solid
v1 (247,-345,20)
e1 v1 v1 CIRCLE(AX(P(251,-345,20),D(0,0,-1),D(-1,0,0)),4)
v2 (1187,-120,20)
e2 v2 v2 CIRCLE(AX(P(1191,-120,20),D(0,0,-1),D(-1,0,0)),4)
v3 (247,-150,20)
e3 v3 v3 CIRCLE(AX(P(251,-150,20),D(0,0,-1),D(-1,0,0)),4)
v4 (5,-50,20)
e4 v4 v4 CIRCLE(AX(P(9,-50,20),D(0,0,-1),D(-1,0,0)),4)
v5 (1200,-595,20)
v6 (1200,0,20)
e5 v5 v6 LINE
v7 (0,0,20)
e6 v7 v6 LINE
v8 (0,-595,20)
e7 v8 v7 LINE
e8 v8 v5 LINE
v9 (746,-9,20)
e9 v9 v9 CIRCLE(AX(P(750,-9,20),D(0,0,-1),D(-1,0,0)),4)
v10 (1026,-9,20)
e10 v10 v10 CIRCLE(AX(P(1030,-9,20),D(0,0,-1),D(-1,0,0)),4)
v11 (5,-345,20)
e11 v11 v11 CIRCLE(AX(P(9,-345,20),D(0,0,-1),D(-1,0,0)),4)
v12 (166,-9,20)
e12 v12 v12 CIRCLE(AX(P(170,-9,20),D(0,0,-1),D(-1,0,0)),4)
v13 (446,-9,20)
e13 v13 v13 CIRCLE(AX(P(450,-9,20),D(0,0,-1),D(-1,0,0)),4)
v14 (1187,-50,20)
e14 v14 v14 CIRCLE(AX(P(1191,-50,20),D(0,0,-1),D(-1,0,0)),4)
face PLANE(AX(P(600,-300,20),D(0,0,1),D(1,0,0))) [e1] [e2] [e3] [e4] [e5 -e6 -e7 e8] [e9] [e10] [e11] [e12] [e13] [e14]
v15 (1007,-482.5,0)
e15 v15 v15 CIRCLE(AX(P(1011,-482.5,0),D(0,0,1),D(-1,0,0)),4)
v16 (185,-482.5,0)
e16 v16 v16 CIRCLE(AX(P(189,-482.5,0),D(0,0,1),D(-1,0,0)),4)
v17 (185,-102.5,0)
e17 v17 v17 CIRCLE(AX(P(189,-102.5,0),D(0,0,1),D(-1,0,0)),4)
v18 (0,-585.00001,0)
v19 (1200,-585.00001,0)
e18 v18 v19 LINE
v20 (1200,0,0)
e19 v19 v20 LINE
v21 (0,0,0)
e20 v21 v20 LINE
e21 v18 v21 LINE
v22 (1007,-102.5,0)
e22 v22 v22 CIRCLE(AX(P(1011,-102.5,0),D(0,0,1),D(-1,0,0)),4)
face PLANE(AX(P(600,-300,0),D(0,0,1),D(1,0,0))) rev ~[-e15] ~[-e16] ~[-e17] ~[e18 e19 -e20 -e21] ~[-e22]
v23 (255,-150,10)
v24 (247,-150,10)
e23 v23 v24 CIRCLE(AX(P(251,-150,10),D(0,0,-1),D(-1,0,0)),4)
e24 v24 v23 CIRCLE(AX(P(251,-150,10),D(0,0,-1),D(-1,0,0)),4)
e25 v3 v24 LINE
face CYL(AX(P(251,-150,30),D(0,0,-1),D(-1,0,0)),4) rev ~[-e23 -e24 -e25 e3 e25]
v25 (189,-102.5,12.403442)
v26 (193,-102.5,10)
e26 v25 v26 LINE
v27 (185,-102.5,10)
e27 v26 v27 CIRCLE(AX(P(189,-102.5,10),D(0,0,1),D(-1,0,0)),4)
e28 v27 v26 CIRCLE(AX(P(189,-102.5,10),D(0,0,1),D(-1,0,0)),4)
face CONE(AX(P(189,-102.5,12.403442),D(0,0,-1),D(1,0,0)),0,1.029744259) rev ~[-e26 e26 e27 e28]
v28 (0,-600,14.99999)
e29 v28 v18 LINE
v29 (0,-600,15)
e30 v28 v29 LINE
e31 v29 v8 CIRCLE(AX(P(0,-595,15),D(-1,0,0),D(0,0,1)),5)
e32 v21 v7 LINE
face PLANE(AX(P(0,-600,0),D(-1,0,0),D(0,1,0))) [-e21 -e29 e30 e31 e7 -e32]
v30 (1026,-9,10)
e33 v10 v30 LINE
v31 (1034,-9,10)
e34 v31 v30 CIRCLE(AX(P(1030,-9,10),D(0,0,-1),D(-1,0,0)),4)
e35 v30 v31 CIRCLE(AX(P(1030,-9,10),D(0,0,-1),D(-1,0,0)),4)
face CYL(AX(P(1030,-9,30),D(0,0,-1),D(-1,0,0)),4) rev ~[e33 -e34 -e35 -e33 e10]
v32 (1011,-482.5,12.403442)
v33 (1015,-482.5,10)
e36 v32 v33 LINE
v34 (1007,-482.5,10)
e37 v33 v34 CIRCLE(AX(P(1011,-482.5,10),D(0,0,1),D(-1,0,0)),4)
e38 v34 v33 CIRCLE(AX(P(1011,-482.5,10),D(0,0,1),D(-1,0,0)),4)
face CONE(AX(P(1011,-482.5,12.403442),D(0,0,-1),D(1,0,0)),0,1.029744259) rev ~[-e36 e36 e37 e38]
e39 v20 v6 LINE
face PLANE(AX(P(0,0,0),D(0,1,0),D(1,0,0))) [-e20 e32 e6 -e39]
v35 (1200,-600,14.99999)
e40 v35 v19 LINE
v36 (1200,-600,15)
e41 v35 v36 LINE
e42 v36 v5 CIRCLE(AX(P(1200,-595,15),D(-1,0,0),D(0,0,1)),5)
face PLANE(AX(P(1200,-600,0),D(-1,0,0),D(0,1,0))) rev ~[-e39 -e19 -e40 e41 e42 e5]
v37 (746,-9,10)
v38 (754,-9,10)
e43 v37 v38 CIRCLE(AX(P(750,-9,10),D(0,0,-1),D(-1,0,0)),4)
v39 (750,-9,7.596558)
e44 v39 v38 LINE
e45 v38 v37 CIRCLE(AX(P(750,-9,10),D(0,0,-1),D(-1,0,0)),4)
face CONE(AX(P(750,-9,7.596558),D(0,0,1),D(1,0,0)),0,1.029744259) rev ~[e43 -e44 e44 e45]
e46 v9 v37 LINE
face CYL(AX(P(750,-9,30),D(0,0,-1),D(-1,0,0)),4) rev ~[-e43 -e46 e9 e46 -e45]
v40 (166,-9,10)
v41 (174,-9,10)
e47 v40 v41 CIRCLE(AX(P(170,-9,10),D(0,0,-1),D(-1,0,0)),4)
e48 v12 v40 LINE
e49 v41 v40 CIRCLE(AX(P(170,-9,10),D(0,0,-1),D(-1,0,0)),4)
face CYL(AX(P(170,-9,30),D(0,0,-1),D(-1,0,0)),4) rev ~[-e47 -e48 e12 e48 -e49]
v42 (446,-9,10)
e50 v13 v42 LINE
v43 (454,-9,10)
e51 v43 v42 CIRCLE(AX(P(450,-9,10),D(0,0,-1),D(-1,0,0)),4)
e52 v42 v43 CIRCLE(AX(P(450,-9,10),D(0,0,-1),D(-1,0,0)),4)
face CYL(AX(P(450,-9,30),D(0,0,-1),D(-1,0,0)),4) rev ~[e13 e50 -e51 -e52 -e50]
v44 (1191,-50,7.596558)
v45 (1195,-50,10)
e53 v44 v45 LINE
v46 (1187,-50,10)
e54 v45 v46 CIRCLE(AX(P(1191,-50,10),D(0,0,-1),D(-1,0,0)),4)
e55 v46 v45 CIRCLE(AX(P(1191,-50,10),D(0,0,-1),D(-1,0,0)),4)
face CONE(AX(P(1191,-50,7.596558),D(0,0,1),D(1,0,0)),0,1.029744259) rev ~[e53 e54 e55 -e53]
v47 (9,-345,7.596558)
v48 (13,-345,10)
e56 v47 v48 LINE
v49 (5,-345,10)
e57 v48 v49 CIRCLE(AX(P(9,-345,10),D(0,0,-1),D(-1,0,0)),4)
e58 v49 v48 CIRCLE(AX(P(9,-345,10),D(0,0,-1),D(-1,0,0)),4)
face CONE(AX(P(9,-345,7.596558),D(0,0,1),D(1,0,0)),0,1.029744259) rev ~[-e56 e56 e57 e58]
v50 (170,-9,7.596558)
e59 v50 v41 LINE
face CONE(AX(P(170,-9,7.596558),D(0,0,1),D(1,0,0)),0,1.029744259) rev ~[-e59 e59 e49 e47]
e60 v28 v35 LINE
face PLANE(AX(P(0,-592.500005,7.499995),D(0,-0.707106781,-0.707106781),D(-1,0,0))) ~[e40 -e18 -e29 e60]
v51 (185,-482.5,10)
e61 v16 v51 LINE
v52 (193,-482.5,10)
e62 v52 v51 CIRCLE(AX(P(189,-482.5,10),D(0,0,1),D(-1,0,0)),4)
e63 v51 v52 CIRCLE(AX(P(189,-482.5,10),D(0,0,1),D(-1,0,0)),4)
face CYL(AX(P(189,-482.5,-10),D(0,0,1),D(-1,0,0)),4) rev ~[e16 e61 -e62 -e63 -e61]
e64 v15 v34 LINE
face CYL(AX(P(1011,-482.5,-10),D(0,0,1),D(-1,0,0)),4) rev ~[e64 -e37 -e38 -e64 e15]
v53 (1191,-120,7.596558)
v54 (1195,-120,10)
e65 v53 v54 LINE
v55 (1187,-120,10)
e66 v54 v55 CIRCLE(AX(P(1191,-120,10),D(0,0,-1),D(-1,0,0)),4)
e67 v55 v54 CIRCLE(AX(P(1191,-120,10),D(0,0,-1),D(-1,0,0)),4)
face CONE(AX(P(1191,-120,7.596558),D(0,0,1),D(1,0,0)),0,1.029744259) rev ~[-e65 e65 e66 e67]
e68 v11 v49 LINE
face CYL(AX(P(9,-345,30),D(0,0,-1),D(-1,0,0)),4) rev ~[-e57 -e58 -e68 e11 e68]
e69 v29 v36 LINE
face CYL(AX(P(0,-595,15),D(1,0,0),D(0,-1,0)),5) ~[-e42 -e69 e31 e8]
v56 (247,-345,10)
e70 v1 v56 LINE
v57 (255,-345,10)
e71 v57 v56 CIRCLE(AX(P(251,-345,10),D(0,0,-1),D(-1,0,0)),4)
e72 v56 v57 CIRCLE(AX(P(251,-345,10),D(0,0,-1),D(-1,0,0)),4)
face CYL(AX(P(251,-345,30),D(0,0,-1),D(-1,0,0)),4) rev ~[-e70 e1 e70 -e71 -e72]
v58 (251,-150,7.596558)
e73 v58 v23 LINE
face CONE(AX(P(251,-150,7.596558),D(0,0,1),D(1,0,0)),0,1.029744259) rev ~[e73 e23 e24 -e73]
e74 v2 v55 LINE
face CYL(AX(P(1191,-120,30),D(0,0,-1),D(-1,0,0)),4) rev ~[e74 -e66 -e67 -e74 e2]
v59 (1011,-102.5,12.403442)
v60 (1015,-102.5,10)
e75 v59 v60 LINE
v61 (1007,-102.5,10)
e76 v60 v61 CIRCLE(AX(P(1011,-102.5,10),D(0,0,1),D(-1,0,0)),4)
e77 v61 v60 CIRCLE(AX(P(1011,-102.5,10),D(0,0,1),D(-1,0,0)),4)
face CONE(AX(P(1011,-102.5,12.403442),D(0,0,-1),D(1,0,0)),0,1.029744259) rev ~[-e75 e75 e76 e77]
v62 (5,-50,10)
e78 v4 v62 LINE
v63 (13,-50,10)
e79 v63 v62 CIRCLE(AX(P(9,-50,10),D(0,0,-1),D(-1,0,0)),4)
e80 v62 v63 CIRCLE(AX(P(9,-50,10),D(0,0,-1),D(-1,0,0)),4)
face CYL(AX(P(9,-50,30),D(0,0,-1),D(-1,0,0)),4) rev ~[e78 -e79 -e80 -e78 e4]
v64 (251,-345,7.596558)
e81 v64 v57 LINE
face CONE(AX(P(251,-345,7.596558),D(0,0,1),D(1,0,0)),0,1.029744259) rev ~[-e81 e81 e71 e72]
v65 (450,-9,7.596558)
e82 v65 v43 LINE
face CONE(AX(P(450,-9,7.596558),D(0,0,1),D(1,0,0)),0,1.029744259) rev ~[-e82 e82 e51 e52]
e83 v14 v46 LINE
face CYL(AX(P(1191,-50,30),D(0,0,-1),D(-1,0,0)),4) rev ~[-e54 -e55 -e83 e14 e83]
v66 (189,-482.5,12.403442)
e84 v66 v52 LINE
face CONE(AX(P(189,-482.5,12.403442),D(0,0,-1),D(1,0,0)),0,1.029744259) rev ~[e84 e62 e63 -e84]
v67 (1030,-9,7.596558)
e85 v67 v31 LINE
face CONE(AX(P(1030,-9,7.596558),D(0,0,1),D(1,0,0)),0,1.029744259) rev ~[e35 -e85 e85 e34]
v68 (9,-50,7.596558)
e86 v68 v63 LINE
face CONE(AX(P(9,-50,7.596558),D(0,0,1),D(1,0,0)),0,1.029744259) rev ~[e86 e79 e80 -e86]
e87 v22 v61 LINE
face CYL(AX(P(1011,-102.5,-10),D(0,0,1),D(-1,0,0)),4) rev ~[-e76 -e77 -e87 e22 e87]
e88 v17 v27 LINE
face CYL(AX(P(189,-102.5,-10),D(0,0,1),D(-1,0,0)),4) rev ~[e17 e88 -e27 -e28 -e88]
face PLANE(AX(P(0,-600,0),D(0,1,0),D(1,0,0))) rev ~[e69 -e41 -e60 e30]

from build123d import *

# Parameters (mm, degrees)
F0_W           = 1200
F0_H           = 600
F1_DEPTH       = 20
F2_R           = 5
F3_SIZE        = 14.99999
F6_D           = 8
F6_DEPTH       = 10
F6_TIP         = 2.4034424761
F6_ON_F5_D     = 8
F6_ON_F5_DEPTH = 10
F6_ON_F5_TIP   = 2.4034424761


# Not quite as in the source:
# - a fillet or chamfer is up to 0.001 mm smaller than in the source, because OpenCascade refuses the exact size


with BuildPart() as f1:
    # F0 (on Top) → F1 (new body)
    with BuildSketch(Plane.XY):
        with Locations((600, -300)):
            Rectangle(F0_W, F0_H)
    extrude(amount=F1_DEPTH)

    # F2
    f2_edges = [f1.edges().sort_by_distance(p)[0] for p in [
        (600, -600, 20),
    ]]
    fillet(f2_edges, radius=F2_R)

    # F3 (size 15 in the source; OpenCascade refuses exactly that, so slightly less here)
    f3_edges = [f1.edges().sort_by_distance(p)[0] for p in [
        (600, -600, 0),
    ]]
    chamfer(f3_edges, length=F3_SIZE)

    # F6
    with Locations(Plane.XY.offset(20)):
        with Locations((1030, -9), (750, -9), (450, -9), (170, -9), (9, -50), (9, -345), (251, -150), (251, -345), (1191, -120), (1191, -50)):
            Hole(F6_D / 2, depth=F6_DEPTH)
            with Locations((0, 0, -(F6_DEPTH + F6_TIP / 2))):  # 118° drill point
                Cone(0, F6_D / 2, F6_TIP, mode=Mode.SUBTRACT)

    # F6 on F5
    with Locations(Plane(origin=(0, 0, 0), x_dir=(1, 0, 0), z_dir=(0, 0, -1))):
        with Locations((189, 482.5), (189, 102.5), (1011, 102.5), (1011, 482.5)):
            Hole(F6_ON_F5_D / 2, depth=F6_ON_F5_DEPTH)
            with Locations((0, 0, -(F6_ON_F5_DEPTH + F6_ON_F5_TIP / 2))):  # 118° drill point
                Cone(0, F6_ON_F5_D / 2, F6_ON_F5_TIP, mode=Mode.SUBTRACT)


solid = f1.part
